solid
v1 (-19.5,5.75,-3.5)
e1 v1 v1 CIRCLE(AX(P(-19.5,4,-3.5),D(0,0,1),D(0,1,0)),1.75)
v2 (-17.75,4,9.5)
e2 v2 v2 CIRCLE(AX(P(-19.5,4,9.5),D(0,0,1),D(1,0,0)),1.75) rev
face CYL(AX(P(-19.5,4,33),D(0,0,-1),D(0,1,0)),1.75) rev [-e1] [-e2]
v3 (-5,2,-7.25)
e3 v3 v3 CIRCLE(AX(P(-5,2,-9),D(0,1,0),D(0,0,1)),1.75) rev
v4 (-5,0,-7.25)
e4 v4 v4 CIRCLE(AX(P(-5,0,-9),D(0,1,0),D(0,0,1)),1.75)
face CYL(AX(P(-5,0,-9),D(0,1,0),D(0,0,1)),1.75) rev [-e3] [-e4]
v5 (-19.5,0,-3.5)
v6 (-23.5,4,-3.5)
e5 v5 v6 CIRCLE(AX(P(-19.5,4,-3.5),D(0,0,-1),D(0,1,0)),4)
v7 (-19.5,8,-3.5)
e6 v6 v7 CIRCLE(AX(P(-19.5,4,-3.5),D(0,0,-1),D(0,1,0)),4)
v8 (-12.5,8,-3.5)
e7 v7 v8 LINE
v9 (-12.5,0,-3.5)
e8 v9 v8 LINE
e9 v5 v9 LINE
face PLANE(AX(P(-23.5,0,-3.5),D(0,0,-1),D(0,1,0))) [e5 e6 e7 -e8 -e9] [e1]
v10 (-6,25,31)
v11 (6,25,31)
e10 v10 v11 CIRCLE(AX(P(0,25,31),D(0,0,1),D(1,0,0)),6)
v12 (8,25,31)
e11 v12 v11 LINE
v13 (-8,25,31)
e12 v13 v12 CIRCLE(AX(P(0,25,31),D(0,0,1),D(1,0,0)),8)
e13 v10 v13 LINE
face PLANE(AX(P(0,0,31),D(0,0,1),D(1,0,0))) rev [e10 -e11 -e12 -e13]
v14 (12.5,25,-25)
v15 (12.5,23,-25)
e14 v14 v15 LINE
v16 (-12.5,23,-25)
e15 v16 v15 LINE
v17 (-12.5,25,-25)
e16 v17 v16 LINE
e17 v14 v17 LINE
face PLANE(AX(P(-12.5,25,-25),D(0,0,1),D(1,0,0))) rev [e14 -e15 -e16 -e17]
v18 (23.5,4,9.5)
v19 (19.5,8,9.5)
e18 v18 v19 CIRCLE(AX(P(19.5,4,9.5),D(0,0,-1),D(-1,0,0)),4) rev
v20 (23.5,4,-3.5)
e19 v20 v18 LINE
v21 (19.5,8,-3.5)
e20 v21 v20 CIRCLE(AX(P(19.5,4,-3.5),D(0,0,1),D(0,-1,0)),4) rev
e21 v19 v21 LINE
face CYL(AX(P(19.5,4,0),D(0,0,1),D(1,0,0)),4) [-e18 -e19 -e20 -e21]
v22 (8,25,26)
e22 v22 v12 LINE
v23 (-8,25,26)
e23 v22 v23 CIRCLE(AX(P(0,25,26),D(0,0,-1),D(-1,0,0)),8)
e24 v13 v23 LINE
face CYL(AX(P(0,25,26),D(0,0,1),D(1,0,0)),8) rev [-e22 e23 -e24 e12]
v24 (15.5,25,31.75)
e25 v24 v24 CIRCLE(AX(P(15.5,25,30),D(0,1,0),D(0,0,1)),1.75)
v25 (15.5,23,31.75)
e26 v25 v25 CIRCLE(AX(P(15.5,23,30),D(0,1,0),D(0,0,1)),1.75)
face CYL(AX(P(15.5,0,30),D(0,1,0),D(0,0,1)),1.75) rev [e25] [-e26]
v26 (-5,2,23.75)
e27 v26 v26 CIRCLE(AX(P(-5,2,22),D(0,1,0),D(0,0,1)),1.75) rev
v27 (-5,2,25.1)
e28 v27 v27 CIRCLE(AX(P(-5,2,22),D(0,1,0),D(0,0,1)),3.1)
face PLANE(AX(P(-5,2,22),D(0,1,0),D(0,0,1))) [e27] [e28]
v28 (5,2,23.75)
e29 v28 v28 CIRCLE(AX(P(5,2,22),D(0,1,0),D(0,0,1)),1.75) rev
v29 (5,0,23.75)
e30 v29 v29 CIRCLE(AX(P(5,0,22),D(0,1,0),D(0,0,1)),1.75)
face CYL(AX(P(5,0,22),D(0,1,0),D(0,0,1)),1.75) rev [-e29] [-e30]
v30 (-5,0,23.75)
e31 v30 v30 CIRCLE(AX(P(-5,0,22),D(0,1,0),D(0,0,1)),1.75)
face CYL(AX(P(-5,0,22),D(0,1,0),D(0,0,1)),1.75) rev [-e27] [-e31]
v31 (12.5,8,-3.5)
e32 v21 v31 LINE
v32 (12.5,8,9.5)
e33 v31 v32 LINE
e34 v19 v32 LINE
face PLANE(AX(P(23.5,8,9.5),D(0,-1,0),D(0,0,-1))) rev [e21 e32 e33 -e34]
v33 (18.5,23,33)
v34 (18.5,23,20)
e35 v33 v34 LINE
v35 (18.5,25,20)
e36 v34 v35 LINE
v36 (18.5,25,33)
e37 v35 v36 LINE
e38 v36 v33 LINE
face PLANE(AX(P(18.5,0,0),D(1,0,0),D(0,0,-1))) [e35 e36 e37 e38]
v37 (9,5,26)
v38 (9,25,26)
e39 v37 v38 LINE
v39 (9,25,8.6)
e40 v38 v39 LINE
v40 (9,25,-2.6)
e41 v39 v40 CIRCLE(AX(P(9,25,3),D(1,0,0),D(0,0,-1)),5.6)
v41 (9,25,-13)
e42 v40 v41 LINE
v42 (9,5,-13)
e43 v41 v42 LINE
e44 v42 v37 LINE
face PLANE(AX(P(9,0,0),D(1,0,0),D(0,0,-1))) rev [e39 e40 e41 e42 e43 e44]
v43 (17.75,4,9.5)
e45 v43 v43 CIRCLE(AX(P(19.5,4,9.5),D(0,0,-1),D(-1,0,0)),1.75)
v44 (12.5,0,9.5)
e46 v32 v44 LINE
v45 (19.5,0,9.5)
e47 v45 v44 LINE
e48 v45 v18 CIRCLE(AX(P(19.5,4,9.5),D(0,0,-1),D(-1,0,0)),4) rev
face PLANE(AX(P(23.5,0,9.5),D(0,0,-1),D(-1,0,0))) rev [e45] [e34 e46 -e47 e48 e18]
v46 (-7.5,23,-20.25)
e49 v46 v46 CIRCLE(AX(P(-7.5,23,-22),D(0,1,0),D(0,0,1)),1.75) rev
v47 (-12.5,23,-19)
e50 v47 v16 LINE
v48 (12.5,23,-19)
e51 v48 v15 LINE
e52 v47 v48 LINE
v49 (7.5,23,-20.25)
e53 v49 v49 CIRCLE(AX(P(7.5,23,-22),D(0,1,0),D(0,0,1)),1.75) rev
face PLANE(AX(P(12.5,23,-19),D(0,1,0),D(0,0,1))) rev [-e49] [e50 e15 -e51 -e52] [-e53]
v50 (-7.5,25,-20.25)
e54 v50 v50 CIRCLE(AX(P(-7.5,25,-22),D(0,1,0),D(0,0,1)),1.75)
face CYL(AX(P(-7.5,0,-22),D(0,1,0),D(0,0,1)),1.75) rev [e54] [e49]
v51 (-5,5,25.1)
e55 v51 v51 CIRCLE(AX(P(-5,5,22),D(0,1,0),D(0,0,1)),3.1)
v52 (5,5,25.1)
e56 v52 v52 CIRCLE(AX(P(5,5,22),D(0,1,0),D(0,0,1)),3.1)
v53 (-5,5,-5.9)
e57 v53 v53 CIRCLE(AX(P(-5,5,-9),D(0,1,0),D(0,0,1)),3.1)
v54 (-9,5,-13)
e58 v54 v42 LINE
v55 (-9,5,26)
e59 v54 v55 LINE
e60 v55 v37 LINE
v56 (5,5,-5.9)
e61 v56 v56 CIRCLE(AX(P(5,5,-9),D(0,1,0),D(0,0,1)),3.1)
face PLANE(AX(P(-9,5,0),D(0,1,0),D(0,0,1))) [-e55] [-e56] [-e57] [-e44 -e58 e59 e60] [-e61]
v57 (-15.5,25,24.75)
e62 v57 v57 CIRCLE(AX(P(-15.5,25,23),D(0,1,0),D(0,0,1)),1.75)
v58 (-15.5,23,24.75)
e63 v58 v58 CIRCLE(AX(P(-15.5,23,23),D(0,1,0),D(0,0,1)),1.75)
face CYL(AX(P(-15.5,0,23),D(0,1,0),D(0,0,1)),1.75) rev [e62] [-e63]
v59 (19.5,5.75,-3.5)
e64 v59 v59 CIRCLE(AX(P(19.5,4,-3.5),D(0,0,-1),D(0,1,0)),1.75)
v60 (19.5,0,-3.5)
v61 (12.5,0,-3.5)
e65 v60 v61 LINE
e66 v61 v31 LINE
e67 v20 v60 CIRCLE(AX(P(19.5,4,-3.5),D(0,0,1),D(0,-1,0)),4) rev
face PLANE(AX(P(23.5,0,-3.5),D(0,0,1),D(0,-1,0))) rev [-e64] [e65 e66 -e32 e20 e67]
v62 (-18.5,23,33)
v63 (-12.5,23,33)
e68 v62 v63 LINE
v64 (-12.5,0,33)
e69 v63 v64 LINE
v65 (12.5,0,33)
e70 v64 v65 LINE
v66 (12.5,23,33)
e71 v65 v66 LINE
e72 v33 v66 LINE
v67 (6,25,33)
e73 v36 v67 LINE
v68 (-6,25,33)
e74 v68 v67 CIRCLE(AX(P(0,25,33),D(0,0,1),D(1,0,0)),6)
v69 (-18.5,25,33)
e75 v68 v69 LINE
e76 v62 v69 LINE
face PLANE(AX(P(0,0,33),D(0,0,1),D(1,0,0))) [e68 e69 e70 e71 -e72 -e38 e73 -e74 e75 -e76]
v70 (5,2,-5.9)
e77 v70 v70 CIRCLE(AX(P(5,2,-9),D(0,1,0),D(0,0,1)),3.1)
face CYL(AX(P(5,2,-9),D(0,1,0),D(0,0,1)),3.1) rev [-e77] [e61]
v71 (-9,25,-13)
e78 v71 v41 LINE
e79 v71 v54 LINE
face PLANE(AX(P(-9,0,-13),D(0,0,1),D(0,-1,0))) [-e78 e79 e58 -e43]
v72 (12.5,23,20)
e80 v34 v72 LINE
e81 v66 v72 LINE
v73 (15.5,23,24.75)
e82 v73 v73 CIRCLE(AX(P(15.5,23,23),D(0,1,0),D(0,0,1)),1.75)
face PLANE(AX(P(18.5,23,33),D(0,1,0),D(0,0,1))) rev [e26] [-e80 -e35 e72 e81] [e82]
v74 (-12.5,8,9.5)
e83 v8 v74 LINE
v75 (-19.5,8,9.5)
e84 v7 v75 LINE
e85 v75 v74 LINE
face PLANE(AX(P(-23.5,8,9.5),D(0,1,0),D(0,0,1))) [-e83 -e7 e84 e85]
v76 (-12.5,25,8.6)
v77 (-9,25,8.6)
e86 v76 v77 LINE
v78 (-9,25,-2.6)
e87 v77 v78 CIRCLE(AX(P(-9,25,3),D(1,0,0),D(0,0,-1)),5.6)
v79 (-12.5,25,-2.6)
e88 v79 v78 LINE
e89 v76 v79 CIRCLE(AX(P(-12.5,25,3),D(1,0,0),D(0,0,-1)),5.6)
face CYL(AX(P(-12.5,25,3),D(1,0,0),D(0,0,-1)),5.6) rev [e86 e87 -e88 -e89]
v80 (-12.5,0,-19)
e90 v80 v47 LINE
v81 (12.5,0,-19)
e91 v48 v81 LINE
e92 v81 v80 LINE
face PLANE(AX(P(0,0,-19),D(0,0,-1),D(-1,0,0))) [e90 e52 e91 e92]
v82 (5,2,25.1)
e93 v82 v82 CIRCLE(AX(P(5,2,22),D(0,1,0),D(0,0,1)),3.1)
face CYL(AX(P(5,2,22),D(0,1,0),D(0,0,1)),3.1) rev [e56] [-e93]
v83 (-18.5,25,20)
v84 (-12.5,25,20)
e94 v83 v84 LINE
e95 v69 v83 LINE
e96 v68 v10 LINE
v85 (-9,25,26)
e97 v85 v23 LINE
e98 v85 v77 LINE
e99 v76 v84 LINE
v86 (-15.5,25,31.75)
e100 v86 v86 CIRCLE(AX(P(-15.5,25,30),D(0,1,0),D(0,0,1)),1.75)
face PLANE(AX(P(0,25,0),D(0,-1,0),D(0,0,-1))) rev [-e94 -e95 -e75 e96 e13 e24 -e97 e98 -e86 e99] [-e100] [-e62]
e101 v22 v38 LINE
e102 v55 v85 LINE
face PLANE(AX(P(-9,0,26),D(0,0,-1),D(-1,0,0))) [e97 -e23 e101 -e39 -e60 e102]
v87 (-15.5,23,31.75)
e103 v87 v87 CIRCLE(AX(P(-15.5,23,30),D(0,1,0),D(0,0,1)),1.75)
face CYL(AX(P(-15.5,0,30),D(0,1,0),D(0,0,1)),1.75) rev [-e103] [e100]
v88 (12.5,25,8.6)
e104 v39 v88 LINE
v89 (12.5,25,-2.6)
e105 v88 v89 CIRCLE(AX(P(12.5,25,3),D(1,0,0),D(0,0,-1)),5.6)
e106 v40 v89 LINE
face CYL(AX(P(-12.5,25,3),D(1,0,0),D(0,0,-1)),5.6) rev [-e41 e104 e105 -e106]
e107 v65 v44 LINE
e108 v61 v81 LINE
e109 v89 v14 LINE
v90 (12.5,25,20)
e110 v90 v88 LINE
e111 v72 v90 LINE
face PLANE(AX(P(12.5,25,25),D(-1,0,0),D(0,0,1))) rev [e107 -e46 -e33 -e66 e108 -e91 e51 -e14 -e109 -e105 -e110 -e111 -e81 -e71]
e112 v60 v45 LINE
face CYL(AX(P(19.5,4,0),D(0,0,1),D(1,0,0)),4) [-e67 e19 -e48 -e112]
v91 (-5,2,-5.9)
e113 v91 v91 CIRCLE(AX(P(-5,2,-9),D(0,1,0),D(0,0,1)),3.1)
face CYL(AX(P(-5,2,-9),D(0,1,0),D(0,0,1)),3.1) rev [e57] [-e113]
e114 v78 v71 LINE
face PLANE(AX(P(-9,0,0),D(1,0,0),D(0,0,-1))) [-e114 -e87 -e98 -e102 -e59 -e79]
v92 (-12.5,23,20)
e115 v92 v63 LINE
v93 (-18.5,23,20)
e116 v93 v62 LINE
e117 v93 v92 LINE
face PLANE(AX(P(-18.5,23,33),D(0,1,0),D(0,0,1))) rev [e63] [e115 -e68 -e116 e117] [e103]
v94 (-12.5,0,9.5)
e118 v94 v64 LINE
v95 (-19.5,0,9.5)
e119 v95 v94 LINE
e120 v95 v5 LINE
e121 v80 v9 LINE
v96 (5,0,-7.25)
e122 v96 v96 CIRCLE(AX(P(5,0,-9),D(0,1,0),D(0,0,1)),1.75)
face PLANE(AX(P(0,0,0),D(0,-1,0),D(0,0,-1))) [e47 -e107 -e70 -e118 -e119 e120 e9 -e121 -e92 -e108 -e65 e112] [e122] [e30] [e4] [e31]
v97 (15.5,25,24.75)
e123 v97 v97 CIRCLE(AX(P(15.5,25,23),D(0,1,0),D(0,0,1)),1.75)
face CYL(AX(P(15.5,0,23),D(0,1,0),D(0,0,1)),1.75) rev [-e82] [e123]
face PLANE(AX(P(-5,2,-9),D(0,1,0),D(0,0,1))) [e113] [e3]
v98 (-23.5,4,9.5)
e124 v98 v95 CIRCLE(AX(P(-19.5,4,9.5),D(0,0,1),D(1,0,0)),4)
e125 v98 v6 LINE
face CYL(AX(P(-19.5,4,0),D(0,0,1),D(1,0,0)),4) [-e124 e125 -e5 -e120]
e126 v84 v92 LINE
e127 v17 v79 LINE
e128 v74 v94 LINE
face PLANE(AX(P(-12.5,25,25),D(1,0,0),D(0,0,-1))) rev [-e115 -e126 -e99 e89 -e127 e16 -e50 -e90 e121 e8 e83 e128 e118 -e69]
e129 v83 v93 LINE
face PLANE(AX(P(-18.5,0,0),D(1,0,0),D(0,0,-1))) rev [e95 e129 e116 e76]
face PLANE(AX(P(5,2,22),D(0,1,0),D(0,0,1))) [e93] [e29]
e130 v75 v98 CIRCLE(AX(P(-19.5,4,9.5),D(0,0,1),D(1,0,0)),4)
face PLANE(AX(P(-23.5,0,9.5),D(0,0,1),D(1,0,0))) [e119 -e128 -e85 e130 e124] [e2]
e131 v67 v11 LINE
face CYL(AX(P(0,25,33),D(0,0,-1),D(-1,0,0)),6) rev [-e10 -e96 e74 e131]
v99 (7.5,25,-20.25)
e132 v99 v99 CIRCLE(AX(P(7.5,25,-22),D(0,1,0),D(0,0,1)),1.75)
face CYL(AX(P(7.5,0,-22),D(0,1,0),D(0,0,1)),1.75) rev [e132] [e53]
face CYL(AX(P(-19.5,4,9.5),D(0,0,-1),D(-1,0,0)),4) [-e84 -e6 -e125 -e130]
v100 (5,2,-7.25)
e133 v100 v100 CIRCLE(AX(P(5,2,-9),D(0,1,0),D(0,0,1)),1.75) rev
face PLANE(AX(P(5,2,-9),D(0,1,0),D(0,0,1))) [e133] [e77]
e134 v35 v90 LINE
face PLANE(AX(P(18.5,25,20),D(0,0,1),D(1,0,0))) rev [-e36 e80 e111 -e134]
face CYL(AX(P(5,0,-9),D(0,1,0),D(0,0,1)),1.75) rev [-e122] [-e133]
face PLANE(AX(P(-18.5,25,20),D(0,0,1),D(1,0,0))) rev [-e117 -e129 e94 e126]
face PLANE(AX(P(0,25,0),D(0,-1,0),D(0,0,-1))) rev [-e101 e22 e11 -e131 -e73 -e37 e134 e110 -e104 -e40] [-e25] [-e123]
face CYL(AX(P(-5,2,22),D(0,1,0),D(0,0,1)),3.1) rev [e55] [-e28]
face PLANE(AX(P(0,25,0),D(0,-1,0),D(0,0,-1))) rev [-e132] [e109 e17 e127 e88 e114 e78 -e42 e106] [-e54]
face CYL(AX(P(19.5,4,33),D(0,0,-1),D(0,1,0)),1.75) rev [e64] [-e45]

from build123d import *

# Parameters (mm, degrees)
CROQUIS2_W                 = 25
CROQUIS2_H                 = 50
SALIENTE_EXTRUIR2_DEPTH    = 25
CROQUIS21_W                = 25
CROQUIS21_H                = 25
SALIENTE_EXTRUIR11_DEPTH   = 6
CROQUIS4_W                 = 39
CROQUIS4_H                 = 20
CORTAR_EXTRUIR1_DEPTH      = 9
CORTAR_EXTRUIR2_DEPTH      = 42.740268327
CORTAR_EXTRUIR2_DEPTH_BACK = 42.740268327
CROQUIS9_R                 = 8
CORTAR_EXTRUIR3_DEPTH      = 5
SALIENTE_EXTRUIR12_DEPTH   = 2
CROQUIS11_W                = 13
CROQUIS11_H                = 2
SALIENTE_EXTRUIR4_DEPTH    = 6
CROQUIS12_R                = 1.75
CORTAR_EXTRUIR4_DEPTH      = 46.345892868
CROQUIS13_W                = 13
CROQUIS13_H                = 2
SALIENTE_EXTRUIR5_DEPTH    = 6
CROQUIS14_R                = 1.75
CORTAR_EXTRUIR5_DEPTH      = 46.345892868
CROQUIS16_R                = 1.75
CORTAR_EXTRUIR6_DEPTH      = 46.345892868
CROQUIS24_R                = 1.75
CORTAR_EXTRUIR8_DEPTH      = 43.793106922
CROQUIS25_W                = 25
CROQUIS25_H                = 23
CORTAR_EXTRUIR9_DEPTH      = 6
CROQUIS28_W                = 13
CROQUIS28_H                = 8
SALIENTE_EXTRUIR13_DEPTH   = 11
REDONDEO1_R                = 4
CROQUIS29_R                = 1.75
CORTAR_EXTRUIR10_DEPTH     = 51.094909921
REDONDEO1_OF_SIMETR_A1_R   = 4
CROQUIS30_R                = 3.1
CORTAR_EXTRUIR11_DEPTH     = 3


with BuildPart() as part:
    # Croquis2 → Saliente-Extruir2 (new body)
    with BuildSketch(Plane(origin=(0, 0, 0), x_dir=(1, 0, 0), z_dir=(0, 1, 0))):
        Rectangle(CROQUIS2_W, CROQUIS2_H)
    extrude(amount=SALIENTE_EXTRUIR2_DEPTH)

    # Croquis21 → Saliente-Extruir11 (add)
    with BuildSketch(Plane.XY.offset(25)):
        with Locations((0, 12.5)):
            Rectangle(CROQUIS21_W, CROQUIS21_H)
    extrude(amount=SALIENTE_EXTRUIR11_DEPTH)

    # Croquis4 → Cortar-Extruir1 (cut, symmetric)
    with BuildSketch(Plane(origin=(0, 0, 0), x_dir=(0, 0, -1), z_dir=(1, 0, 0))):
        with Locations((-6.5, 15)):
            Rectangle(CROQUIS4_W, CROQUIS4_H)
    extrude(amount=CORTAR_EXTRUIR1_DEPTH, both=True, mode=Mode.SUBTRACT)

    # Croquis5 → Cortar-Extruir2 (cut, two sides: drawn at the far end of the back side and taken through both)
    with BuildSketch(Plane(origin=(0, 0, 0), x_dir=(0, 0, -1), z_dir=(1, 0, 0)).offset(-CORTAR_EXTRUIR2_DEPTH_BACK)):
        with BuildLine():
            ThreePointArc((2.6, 25), (-3, 30.6), (-8.6, 25))
            Line((-8.6, 25), (2.6, 25))
        make_face()
        with BuildLine():
            Line((2.6, 25), (-8.6, 25))
            ThreePointArc((-8.6, 25), (-3, 19.4), (2.6, 25))
        make_face()
    extrude(amount=CORTAR_EXTRUIR2_DEPTH + CORTAR_EXTRUIR2_DEPTH_BACK, mode=Mode.SUBTRACT)

    # Croquis9 → Cortar-Extruir3 (cut)
    with BuildSketch(Plane.XY.offset(31)):
        with Locations((0, 25)):
            Circle(CROQUIS9_R)
    extrude(amount=-CORTAR_EXTRUIR3_DEPTH, mode=Mode.SUBTRACT)

    # Croquis23 → Saliente-Extruir12 (add)
    with BuildSketch(Plane.XY.offset(31)):
        with BuildLine():
            Line((12.5, 25), (6, 25))
            ThreePointArc((6, 25), (0, 19), (-6, 25))
            Line((-6, 25), (-12.5, 25))
            Line((-12.5, 25), (-12.5, 0))
            Line((-12.5, 0), (12.5, 0))
            Line((12.5, 0), (12.5, 25))
        make_face()
    extrude(amount=SALIENTE_EXTRUIR12_DEPTH)

    # Croquis11 → Saliente-Extruir4 (add)
    with BuildSketch(Plane(origin=(12.5, 0, 0), x_dir=(0, 0, -1), z_dir=(1, 0, 0))):
        with Locations((-26.5, 24)):
            Rectangle(CROQUIS11_W, CROQUIS11_H)
    extrude(amount=SALIENTE_EXTRUIR4_DEPTH)

    # Croquis12 → Cortar-Extruir4 (cut, through all)
    with BuildSketch(Plane(origin=(0, 25, 0), x_dir=(1, 0, 0), z_dir=(0, 1, 0))):
        with Locations(Location((15.5, -23, 0), (0, 0, 270))):
            Circle(CROQUIS12_R)
        with Locations(Location((15.5, -30, 0), (0, 0, 270))):
            Circle(CROQUIS12_R)
    extrude(amount=-CORTAR_EXTRUIR4_DEPTH, mode=Mode.SUBTRACT)

    # Croquis13 → Saliente-Extruir5 (add)
    with BuildSketch(Plane.ZY.offset(12.5)):
        with Locations((26.5, 24)):
            Rectangle(CROQUIS13_W, CROQUIS13_H)
    extrude(amount=SALIENTE_EXTRUIR5_DEPTH)

    # Croquis14 → Cortar-Extruir5 (cut, through all)
    with BuildSketch(Plane(origin=(0, 25, 0), x_dir=(1, 0, 0), z_dir=(0, 1, 0))):
        with Locations(Location((-15.5, -23, 0), (0, 0, 270))):
            Circle(CROQUIS14_R)
        with Locations(Location((-15.5, -30, 0), (0, 0, 270))):
            Circle(CROQUIS14_R)
    extrude(amount=-CORTAR_EXTRUIR5_DEPTH, mode=Mode.SUBTRACT)

    # Croquis16 → Cortar-Extruir6 (cut, through all)
    with BuildSketch(Plane(origin=(0, 25, 0), x_dir=(1, 0, 0), z_dir=(0, 1, 0))):
        with Locations(Location((-7.5, 22, 0), (0, 0, 270))):
            Circle(CROQUIS16_R)
        with Locations(Location((7.5, 22, 0), (0, 0, 270))):
            Circle(CROQUIS16_R)
    extrude(amount=-CORTAR_EXTRUIR6_DEPTH, mode=Mode.SUBTRACT)

    # Croquis24 → Cortar-Extruir8 (cut, through all)
    with BuildSketch(Plane(origin=(0, 5, 0), x_dir=(1, 0, 0), z_dir=(0, 1, 0))):
        with Locations(Location((-5, -22, 0), (0, 0, 270))):
            Circle(CROQUIS24_R)
        with Locations(Location((-5, 9, 0), (0, 0, 270))):
            Circle(CROQUIS24_R)
        with Locations(Location((5, -22, 0), (0, 0, 270))):
            Circle(CROQUIS24_R)
        with Locations(Location((5, 9, 0), (0, 0, 270))):
            Circle(CROQUIS24_R)
    extrude(amount=-CORTAR_EXTRUIR8_DEPTH, mode=Mode.SUBTRACT)

    # Croquis25 → Cortar-Extruir9 (cut)
    with BuildSketch(Plane(origin=(0, 0, -25), x_dir=(-1, 0, 0), z_dir=(0, 0, -1))):
        with Locations((0, 11.5)):
            Rectangle(CROQUIS25_W, CROQUIS25_H)
    extrude(amount=-CORTAR_EXTRUIR9_DEPTH, mode=Mode.SUBTRACT)

    # Croquis28 → Saliente-Extruir13 (add)
    with BuildSketch(Plane(origin=(12.5, 0, 0), x_dir=(0, 0, -1), z_dir=(1, 0, 0))):
        with Locations((-3, 4)):
            Rectangle(CROQUIS28_W, CROQUIS28_H)
    saliente_extruir13 = extrude(amount=SALIENTE_EXTRUIR13_DEPTH)

    # Redondeo1
    redondeo1_edges = [part.edges().sort_by_distance(p)[0] for p in [
        (23.5, 0, 3),
        (23.5, 8, 3),
    ]]
    fillet(redondeo1_edges, radius=REDONDEO1_R - 0.0001)  # a hair under: the kernel refuses the full size

    # Croquis29 → Cortar-Extruir10 (cut, through all)
    with BuildSketch(Plane(origin=(0, 0, -3.5), x_dir=(-1, 0, 0), z_dir=(0, 0, -1))):
        with Locations(Location((-19.5, 4, 0), (0, 0, 90))):
            Circle(CROQUIS29_R)
    cortar_extruir10 = extrude(amount=-CORTAR_EXTRUIR10_DEPTH, mode=Mode.SUBTRACT)

    # Simetría1: Saliente-Extruir13, Cortar-Extruir10 across plane
    add(saliente_extruir13.mirror(Plane.ZY))
    add(cortar_extruir10.mirror(Plane.ZY), mode=Mode.SUBTRACT)

    # Redondeo1 of Simetría1
    redondeo1_of_simetr_a1_edges = [part.edges().sort_by_distance(p)[0] for p in [
        (-23.5, 0, 3),
        (-23.5, 8, 3),
    ]]
    fillet(redondeo1_of_simetr_a1_edges, radius=REDONDEO1_OF_SIMETR_A1_R - 0.0001)  # a hair under: the kernel refuses the full size

    # Croquis30 → Cortar-Extruir11 (cut)
    with BuildSketch(Plane(origin=(0, 5, 0), x_dir=(1, 0, 0), z_dir=(0, 1, 0))):
        with Locations(Location((-5, 9, 0), (0, 0, 270))):
            Circle(CROQUIS30_R)
        with Locations(Location((-5, -22, 0), (0, 0, 270))):
            Circle(CROQUIS30_R)
        with Locations(Location((5, -22, 0), (0, 0, 270))):
            Circle(CROQUIS30_R)
        with Locations(Location((5, 9, 0), (0, 0, 270))):
            Circle(CROQUIS30_R)
    extrude(amount=-CORTAR_EXTRUIR11_DEPTH, mode=Mode.SUBTRACT)


solid = part.part
